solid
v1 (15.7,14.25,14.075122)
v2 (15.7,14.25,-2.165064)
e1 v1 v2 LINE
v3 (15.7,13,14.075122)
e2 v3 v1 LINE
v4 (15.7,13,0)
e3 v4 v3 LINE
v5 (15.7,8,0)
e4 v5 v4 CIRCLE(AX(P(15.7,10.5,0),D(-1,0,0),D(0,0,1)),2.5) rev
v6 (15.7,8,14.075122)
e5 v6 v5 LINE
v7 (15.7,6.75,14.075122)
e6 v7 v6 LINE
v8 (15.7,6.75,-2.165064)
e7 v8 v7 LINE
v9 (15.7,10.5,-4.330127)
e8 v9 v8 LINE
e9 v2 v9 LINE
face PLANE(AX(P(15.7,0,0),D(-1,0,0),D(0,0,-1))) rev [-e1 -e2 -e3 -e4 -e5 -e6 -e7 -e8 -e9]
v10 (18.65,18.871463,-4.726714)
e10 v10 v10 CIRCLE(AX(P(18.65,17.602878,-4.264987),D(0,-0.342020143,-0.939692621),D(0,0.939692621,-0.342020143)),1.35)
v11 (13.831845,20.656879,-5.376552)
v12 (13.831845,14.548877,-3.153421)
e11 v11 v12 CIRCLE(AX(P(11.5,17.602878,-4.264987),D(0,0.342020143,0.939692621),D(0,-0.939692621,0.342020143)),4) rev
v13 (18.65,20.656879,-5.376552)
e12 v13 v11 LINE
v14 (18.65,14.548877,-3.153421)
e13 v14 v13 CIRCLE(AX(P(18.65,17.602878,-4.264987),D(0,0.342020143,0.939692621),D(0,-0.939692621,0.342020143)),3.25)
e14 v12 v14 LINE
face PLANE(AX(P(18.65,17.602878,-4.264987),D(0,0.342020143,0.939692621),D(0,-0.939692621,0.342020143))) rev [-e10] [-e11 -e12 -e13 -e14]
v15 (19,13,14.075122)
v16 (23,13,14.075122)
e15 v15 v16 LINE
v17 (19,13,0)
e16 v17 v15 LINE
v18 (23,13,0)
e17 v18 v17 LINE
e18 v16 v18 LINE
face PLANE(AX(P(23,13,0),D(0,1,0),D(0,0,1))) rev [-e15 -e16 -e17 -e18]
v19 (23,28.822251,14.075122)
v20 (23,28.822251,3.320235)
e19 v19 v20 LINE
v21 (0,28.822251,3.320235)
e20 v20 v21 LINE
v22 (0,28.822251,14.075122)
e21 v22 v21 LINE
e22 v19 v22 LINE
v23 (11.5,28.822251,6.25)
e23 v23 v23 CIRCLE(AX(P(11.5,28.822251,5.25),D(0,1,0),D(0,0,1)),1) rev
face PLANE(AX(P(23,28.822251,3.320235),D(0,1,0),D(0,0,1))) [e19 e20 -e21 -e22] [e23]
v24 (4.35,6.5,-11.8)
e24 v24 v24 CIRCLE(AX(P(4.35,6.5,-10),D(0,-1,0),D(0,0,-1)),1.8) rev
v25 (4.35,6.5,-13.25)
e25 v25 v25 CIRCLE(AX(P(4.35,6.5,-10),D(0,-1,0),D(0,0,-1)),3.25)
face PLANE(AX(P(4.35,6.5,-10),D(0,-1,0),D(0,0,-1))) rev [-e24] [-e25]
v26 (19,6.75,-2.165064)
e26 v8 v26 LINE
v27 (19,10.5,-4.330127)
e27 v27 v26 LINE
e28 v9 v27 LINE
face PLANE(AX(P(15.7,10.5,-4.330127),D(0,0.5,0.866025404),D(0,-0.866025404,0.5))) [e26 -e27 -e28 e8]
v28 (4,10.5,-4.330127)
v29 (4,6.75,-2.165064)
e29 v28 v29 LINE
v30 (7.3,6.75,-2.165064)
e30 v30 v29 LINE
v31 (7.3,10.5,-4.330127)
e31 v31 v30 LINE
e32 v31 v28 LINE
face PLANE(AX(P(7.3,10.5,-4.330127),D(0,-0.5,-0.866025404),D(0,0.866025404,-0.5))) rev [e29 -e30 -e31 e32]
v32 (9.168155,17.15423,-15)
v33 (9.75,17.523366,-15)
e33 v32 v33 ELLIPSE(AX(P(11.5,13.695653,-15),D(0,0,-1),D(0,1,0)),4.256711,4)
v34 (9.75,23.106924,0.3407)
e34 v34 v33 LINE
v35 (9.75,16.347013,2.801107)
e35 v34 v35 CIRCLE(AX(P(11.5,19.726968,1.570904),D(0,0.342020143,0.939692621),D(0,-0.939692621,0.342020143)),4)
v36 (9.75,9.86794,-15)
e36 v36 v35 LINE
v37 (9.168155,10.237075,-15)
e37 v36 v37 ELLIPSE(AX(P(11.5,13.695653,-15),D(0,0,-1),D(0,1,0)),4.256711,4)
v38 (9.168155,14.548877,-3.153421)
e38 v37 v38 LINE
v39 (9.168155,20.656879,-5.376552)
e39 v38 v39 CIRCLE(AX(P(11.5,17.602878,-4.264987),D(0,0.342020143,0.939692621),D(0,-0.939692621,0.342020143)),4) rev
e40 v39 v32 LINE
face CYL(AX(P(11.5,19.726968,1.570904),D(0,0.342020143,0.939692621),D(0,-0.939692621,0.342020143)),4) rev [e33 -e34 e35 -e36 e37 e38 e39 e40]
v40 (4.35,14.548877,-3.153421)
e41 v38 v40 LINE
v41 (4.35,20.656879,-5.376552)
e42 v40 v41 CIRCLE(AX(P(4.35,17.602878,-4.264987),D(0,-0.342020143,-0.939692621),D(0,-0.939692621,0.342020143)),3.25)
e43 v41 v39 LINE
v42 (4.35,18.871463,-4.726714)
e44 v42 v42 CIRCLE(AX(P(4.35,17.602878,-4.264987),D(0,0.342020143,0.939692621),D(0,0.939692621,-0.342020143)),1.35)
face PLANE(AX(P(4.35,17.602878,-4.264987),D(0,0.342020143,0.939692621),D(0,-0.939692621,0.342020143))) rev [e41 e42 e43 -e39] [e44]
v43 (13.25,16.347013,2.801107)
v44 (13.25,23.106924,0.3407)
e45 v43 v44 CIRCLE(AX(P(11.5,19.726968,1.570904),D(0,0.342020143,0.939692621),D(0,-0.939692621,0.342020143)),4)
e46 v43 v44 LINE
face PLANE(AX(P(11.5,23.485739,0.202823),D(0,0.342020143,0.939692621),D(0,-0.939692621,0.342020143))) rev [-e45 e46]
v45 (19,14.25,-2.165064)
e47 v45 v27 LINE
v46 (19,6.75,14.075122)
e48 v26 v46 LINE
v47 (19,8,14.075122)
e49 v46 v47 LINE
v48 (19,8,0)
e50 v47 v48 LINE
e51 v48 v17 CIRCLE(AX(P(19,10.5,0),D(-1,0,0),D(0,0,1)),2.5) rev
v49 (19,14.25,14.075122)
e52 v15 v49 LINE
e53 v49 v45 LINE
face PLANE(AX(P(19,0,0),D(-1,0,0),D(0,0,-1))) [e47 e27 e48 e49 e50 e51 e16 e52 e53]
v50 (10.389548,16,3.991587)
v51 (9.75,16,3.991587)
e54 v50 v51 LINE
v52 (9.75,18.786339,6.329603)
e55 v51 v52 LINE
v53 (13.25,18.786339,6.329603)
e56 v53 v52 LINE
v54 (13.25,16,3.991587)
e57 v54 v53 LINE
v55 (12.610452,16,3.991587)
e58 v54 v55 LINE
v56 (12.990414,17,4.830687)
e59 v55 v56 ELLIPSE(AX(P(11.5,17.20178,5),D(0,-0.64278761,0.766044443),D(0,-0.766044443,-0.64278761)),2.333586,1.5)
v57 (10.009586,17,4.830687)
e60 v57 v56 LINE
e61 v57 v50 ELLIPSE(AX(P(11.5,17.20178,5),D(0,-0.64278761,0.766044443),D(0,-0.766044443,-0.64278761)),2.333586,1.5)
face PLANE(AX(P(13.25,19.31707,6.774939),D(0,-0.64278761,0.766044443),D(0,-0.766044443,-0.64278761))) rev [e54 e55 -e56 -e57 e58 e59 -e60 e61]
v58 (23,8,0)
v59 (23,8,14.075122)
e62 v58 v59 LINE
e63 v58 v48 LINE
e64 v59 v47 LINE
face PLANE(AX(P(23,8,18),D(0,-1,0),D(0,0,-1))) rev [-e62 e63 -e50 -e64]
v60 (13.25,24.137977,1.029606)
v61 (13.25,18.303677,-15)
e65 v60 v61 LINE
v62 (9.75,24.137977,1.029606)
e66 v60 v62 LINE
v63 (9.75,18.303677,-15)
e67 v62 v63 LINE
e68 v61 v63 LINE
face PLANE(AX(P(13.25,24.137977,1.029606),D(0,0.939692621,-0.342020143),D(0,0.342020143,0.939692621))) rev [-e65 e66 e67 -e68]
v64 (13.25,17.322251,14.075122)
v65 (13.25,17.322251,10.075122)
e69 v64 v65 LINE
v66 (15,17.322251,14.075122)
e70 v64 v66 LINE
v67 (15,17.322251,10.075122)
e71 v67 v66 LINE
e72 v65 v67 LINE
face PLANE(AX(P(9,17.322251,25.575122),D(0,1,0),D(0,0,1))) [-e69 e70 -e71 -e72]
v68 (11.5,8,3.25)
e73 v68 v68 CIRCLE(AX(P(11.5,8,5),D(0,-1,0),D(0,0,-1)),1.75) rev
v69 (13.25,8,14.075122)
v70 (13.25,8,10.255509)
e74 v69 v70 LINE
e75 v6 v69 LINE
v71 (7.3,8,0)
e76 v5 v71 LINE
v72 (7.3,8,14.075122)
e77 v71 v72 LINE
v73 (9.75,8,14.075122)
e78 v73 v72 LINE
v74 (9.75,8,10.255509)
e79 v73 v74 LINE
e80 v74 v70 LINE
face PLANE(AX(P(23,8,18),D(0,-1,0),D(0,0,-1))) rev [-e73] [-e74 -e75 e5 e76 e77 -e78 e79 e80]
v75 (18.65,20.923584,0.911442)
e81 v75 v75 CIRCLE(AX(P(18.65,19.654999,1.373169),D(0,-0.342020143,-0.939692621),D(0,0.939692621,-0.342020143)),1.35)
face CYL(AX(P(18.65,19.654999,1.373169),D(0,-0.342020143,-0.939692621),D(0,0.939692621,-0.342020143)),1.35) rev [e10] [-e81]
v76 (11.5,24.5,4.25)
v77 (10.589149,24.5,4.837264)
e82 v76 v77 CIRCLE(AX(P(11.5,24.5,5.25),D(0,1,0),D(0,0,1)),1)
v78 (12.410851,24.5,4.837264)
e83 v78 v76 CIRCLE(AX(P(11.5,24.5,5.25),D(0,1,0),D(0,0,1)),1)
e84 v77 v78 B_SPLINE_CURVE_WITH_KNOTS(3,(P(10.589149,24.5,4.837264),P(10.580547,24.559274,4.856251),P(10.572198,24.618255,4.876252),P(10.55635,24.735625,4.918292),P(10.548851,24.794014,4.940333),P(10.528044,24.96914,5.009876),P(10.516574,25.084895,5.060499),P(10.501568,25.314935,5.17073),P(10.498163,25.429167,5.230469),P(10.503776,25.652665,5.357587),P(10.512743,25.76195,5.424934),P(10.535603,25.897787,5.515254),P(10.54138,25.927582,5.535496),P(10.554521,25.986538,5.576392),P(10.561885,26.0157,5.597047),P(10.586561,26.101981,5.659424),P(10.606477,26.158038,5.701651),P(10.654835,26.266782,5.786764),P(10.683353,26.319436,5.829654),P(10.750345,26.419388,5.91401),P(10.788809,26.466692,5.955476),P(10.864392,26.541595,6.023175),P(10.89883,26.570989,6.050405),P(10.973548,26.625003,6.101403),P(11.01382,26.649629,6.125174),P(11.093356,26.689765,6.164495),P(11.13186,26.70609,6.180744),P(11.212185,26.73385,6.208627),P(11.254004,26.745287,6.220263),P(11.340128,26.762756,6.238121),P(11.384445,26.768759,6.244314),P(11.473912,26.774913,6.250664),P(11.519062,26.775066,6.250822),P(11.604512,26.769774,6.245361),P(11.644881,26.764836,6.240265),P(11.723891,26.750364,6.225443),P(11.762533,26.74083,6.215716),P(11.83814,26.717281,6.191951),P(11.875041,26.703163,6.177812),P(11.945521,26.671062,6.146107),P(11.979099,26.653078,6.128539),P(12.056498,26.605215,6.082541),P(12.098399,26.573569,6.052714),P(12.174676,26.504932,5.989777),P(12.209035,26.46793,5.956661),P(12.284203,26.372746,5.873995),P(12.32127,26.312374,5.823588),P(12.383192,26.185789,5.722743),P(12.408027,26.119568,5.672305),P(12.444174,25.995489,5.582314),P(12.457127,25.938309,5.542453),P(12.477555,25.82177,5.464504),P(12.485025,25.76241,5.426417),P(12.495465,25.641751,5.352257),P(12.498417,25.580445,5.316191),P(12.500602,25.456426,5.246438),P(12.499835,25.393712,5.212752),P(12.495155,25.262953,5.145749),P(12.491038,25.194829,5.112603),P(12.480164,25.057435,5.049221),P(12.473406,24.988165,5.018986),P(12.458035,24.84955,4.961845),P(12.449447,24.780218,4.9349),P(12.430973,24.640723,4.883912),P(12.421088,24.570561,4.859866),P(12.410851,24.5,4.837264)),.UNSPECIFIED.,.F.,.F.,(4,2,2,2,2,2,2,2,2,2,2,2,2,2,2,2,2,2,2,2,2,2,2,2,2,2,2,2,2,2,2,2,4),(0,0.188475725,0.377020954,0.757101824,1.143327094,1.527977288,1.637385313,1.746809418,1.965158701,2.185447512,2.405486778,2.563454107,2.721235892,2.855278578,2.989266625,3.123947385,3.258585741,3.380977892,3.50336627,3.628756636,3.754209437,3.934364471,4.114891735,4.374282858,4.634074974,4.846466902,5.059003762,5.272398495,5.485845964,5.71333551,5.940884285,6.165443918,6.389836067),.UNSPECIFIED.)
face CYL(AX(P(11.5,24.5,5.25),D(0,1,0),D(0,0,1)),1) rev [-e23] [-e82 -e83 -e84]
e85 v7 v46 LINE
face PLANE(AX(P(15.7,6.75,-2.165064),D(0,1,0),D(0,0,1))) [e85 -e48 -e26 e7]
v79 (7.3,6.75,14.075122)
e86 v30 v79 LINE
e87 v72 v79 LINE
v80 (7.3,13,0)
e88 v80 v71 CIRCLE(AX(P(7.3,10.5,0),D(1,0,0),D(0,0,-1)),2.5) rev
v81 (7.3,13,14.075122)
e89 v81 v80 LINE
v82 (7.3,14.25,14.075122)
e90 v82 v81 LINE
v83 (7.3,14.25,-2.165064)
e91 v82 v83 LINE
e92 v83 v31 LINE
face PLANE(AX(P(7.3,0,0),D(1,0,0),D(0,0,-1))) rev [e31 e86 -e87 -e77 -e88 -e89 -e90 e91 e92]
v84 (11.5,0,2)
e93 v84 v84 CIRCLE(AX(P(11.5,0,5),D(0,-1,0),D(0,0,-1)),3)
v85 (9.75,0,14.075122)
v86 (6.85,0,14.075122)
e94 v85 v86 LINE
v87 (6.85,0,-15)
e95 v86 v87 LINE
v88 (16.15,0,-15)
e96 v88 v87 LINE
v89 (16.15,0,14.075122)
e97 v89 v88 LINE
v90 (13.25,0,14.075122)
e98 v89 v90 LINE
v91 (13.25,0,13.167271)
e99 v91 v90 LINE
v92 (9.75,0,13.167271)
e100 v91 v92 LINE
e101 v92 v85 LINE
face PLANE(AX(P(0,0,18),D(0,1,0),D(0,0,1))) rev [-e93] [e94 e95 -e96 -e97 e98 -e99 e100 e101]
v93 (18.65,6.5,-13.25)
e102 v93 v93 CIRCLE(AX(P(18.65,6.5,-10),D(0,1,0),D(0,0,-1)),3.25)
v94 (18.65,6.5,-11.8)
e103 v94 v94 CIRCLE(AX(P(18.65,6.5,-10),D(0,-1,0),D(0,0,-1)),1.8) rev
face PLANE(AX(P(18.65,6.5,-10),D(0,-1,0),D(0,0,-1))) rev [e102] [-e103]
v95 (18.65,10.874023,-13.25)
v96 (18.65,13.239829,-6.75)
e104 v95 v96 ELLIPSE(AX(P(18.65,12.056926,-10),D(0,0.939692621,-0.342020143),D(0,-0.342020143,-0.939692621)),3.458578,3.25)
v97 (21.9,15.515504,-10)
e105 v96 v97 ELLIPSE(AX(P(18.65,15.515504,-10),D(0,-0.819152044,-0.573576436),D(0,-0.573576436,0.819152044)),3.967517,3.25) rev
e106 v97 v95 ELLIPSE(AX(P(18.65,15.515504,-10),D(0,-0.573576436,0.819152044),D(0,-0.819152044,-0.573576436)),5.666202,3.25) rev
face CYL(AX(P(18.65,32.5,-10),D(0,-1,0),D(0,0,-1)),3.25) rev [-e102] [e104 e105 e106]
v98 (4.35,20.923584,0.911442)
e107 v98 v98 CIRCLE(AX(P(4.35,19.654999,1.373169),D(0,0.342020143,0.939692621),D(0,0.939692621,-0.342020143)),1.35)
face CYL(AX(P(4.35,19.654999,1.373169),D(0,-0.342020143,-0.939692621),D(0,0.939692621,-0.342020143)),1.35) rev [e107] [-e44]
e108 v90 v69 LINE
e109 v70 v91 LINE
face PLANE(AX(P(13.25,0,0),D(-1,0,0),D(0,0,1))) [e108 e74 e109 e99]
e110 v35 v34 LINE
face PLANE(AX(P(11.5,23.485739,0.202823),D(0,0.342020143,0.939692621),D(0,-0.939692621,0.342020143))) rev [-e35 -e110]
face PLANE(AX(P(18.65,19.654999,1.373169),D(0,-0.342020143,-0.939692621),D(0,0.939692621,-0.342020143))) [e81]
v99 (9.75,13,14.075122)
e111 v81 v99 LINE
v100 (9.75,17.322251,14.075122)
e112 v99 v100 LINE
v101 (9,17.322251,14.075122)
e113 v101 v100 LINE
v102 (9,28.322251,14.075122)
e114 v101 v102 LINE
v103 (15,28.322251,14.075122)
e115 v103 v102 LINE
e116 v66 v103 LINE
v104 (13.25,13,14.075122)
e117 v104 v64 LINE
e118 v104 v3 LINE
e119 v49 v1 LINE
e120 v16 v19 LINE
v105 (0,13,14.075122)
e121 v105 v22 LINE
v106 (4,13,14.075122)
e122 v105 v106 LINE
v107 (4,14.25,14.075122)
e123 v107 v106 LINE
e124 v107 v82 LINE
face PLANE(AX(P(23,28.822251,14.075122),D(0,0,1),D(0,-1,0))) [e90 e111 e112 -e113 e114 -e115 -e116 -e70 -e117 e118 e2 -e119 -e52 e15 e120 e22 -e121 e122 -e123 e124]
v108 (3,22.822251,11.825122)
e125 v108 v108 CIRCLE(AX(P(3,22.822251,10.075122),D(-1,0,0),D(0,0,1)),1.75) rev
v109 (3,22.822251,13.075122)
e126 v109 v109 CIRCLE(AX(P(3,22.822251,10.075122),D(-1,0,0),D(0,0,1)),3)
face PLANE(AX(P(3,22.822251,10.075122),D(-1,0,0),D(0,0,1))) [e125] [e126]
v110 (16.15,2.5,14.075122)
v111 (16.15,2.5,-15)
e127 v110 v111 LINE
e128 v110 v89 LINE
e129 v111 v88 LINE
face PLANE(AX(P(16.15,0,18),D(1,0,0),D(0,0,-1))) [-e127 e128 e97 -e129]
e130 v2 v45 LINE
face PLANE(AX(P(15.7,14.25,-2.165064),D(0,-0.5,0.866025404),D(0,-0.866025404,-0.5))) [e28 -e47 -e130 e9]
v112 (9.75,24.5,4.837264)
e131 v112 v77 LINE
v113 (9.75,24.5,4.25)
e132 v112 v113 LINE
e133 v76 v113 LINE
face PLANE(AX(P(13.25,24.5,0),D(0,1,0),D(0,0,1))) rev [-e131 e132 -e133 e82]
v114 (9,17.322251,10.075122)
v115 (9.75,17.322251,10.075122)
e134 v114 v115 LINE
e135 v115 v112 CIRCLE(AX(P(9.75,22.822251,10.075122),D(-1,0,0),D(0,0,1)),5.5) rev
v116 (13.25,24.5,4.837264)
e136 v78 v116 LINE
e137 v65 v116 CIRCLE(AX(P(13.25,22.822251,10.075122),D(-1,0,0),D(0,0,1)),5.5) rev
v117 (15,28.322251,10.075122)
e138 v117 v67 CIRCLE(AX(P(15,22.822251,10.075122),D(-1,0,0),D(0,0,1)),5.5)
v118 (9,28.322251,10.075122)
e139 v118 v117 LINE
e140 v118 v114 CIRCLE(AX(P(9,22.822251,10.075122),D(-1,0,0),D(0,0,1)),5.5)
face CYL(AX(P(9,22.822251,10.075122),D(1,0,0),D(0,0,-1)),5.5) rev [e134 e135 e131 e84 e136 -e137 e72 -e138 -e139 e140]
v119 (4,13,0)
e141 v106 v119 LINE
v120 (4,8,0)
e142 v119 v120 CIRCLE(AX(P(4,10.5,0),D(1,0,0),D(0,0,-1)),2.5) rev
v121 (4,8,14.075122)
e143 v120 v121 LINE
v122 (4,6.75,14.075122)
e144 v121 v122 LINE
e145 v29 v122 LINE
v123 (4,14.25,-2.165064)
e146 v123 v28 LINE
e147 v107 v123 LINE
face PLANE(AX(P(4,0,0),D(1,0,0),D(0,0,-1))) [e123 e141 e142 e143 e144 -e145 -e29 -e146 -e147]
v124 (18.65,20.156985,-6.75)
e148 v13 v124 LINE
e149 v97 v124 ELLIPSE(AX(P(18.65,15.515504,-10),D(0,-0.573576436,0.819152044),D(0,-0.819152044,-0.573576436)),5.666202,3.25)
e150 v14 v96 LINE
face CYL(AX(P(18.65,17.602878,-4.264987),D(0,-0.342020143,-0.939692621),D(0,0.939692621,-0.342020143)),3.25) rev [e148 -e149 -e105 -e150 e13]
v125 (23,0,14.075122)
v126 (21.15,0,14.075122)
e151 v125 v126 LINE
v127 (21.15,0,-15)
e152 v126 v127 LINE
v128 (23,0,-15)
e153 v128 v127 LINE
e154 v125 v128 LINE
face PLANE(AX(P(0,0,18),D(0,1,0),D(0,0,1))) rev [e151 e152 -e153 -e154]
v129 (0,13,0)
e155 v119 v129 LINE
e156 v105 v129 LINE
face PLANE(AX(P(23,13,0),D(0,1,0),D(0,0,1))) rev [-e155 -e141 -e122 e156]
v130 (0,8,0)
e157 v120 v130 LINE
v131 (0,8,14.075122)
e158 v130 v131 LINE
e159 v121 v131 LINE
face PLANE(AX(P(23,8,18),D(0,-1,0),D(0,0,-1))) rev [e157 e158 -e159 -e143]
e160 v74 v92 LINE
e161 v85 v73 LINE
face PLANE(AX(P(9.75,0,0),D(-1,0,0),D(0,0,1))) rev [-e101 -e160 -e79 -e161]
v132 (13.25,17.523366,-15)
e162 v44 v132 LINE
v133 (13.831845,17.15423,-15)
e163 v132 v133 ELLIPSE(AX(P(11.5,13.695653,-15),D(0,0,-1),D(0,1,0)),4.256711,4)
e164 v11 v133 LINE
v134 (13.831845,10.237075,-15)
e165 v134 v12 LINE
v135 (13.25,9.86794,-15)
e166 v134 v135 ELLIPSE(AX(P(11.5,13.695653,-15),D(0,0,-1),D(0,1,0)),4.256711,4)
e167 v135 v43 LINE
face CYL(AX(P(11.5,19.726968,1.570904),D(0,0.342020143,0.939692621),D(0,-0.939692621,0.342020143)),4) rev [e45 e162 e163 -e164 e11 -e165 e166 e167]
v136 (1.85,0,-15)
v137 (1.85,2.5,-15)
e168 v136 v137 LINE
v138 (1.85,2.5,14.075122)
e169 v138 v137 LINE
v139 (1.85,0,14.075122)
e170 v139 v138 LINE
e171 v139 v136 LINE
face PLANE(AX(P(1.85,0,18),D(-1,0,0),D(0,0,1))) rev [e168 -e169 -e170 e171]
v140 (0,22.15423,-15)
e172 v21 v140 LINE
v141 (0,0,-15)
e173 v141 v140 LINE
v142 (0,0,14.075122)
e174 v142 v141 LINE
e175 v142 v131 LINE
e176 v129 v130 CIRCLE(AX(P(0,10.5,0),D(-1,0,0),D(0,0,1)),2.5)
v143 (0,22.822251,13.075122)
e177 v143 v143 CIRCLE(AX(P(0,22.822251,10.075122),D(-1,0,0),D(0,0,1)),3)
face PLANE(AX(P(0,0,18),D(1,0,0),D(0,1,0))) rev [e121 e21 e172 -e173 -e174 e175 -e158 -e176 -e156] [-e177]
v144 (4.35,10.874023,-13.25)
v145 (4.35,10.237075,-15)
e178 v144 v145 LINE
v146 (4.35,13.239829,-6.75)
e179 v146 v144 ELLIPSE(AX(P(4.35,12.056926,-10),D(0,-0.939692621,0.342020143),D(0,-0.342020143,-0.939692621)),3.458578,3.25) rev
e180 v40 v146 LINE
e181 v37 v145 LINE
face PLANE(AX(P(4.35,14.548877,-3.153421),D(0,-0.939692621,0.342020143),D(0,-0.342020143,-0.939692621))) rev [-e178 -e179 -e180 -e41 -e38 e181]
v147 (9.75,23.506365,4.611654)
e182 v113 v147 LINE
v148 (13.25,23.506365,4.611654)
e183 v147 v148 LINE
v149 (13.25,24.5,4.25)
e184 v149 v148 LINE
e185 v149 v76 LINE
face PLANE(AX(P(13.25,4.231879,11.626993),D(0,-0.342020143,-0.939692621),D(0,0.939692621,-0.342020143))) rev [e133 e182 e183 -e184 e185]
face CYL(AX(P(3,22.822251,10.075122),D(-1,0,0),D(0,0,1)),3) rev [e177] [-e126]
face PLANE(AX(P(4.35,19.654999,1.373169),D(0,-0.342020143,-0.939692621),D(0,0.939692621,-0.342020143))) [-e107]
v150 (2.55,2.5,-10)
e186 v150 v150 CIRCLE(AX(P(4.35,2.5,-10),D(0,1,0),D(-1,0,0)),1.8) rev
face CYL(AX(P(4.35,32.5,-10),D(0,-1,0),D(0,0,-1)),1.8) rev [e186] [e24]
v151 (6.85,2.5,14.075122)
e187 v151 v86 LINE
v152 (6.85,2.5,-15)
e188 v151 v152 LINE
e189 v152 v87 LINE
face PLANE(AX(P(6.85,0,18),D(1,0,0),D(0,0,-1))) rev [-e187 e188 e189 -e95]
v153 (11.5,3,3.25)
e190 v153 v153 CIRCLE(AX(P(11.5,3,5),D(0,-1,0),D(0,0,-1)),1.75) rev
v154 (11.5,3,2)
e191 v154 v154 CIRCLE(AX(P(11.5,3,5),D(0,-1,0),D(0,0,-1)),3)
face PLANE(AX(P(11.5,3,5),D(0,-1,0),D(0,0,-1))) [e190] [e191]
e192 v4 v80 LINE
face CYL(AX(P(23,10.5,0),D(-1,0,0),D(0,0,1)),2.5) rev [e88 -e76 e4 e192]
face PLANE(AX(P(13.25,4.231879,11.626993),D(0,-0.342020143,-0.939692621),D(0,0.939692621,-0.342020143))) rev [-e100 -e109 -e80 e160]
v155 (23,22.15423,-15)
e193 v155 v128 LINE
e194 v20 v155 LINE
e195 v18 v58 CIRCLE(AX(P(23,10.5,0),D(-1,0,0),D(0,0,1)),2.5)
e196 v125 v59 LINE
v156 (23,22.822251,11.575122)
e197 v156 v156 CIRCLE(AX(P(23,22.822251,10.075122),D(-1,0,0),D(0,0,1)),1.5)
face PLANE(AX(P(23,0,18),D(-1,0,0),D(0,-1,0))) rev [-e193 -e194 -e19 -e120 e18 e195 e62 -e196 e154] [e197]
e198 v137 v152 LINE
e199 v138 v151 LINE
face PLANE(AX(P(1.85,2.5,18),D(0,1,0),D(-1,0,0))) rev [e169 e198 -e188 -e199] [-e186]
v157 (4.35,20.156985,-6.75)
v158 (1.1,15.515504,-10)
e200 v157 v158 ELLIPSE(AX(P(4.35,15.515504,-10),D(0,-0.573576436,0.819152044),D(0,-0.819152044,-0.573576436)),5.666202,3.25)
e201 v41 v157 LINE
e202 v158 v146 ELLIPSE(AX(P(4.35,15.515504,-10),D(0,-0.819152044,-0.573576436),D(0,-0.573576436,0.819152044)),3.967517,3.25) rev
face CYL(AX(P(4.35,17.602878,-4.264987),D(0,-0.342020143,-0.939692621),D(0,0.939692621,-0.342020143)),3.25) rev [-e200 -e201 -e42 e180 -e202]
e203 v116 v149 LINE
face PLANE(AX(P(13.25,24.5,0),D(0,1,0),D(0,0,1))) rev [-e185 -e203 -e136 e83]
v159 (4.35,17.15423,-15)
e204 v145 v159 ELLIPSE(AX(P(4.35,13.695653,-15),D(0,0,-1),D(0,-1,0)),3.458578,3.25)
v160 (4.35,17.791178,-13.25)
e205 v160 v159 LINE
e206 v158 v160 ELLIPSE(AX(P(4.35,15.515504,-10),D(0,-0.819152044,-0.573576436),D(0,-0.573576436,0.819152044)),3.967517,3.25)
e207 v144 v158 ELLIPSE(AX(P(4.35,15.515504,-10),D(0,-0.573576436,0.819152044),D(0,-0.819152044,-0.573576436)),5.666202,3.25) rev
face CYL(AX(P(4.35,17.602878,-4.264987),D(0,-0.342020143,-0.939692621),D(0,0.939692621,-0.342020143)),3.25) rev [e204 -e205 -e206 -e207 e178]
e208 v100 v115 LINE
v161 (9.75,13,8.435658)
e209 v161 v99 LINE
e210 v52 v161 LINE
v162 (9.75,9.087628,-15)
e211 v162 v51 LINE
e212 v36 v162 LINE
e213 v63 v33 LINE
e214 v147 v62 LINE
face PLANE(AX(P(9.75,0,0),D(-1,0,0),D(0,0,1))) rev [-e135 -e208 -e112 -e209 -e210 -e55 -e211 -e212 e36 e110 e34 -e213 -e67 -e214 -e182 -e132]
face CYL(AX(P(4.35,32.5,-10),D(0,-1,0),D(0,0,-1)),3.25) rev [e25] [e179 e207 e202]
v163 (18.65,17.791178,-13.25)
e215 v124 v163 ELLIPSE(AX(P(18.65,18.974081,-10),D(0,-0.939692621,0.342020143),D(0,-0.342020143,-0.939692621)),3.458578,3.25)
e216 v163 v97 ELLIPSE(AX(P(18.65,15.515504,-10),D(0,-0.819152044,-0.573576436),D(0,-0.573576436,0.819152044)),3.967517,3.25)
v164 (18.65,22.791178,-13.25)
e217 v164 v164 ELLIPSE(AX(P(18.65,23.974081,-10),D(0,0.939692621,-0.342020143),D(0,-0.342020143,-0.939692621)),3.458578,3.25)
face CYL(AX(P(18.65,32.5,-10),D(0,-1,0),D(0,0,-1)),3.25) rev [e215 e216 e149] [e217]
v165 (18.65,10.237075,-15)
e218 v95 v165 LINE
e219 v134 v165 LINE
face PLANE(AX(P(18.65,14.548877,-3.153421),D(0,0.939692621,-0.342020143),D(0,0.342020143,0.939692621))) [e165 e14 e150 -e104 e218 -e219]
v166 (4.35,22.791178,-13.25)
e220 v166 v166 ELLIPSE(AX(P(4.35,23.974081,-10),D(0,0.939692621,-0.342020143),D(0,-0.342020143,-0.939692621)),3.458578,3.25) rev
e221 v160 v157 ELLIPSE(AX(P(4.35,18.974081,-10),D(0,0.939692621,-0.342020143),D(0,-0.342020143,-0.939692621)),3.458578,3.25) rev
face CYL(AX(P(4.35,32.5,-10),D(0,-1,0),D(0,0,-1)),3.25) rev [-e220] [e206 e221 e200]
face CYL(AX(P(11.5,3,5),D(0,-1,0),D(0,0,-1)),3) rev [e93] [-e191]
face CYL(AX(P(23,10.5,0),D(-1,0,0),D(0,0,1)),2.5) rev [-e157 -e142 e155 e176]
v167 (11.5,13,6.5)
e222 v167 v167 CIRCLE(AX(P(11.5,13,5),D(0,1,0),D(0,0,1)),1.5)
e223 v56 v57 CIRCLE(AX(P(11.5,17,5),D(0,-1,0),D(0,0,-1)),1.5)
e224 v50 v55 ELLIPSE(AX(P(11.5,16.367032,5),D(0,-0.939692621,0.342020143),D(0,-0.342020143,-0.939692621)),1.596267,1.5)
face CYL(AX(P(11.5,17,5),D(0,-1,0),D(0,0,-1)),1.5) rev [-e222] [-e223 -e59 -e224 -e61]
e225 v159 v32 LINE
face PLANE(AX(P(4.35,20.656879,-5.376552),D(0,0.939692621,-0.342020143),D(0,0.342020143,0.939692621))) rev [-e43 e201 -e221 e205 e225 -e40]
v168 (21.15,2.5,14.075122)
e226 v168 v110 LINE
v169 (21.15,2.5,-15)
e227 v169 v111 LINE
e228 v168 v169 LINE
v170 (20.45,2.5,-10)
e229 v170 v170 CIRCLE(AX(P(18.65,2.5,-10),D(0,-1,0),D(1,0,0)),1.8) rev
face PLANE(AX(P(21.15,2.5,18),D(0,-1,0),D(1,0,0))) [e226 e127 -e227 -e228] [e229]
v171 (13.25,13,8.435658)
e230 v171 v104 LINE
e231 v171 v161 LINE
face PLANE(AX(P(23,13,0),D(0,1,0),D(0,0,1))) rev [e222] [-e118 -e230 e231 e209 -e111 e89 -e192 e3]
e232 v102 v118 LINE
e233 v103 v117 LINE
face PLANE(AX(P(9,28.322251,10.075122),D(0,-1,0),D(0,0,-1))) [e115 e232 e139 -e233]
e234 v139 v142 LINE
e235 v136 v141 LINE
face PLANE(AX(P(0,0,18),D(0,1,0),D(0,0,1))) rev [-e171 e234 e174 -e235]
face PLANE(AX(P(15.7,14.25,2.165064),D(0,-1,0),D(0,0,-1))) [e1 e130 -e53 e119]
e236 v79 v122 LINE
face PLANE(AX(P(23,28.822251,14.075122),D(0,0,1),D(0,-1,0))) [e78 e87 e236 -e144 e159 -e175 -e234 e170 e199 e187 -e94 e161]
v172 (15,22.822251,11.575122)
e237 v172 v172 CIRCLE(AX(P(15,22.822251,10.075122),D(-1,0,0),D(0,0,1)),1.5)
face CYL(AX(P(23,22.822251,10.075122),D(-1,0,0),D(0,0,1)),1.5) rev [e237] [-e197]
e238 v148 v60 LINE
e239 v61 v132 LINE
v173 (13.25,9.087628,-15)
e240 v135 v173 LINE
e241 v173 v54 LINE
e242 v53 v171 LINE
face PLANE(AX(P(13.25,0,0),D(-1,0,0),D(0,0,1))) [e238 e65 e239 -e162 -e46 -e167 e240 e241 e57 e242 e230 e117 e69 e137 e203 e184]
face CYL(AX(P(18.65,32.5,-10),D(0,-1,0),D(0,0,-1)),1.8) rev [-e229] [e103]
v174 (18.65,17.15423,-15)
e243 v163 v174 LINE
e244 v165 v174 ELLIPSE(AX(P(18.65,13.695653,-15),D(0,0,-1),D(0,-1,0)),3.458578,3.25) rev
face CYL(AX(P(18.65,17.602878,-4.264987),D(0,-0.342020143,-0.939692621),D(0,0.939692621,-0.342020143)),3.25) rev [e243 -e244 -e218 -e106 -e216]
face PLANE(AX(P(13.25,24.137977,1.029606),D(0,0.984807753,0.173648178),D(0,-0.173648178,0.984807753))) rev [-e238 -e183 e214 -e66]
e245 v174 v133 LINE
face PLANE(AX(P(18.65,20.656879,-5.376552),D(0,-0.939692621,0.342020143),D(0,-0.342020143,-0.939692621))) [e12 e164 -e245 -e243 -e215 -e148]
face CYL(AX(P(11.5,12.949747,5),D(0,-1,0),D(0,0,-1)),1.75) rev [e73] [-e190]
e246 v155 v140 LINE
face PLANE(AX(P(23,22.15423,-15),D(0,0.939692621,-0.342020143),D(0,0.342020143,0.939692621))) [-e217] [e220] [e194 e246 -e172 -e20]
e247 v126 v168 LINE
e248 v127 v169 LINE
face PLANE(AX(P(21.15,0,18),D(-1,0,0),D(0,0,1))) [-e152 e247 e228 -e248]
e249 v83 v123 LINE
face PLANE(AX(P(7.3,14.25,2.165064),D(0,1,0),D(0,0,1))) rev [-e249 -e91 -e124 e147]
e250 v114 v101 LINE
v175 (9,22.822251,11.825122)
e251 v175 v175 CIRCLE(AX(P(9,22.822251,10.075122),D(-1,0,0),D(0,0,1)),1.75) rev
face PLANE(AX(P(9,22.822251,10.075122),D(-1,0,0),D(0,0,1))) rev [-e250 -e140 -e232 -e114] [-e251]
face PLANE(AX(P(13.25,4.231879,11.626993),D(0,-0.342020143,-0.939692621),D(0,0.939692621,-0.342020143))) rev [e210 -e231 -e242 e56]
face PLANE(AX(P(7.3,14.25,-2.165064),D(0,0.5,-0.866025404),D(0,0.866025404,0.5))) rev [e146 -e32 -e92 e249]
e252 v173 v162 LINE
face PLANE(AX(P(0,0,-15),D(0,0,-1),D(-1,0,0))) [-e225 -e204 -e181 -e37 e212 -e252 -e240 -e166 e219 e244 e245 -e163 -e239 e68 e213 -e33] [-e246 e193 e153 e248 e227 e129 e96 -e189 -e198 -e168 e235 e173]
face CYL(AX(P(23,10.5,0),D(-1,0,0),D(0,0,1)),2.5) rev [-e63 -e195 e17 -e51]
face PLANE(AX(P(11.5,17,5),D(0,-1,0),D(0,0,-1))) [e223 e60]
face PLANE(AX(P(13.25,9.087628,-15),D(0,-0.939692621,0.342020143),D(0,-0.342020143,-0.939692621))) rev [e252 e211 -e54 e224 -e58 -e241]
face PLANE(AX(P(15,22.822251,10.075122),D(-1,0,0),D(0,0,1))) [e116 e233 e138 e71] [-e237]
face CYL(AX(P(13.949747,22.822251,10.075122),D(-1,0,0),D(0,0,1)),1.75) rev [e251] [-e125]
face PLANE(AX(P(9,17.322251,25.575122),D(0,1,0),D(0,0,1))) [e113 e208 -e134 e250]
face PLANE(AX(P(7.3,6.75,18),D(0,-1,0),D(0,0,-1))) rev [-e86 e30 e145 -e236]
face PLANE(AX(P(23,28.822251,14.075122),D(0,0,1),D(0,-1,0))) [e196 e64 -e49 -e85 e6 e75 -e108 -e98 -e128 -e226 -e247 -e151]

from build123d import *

# Parameters (mm, degrees)
SKETCH1_W                = 23
SKETCH1_H                = 32.5
BOSS_EXTRUDE1_DEPTH      = 18
SKETCH2_W                = 23
SKETCH2_H                = 25
BOSS_EXTRUDE2_DEPTH      = 15
CHAMFER1_SIZE            = 15
SKETCH3_R                = 1.8
CUT_EXTRUDE1_DEPTH       = 44.694965385
CUT_EXTRUDE2_DEPTH       = 44.694965385
CUT_EXTRUDE3_START       = -4
CUT_EXTRUDE3_DEPTH       = 3.3
SKETCH7_W                = 5
SKETCH7_H                = 2.5
CUT_EXTRUDE4_DEPTH       = 52.713151132
CUT_EXTRUDE5_START       = -6.5
SKETCH8_R                = 3.25
CUT_EXTRUDE5_DEPTH       = 38.194965385
SKETCH9_R                = 1
CUT_EXTRUDE6_DEPTH       = 8
CUT_EXTRUDE8_DEPTH       = 1.75
CUT_EXTRUDE7_DEPTH       = 1.75
CUT_EXTRUDE9_DEPTH       = 13
SKETCH15_R               = 1.35
CUT_EXTRUDE10_DEPTH      = 6
CUT_EXTRUDE11_DEPTH      = 2.5
CUT_EXTRUDE11_DEPTH_BACK = 3.5
SKETCH17_R               = 1.75
CUT_EXTRUDE12_DEPTH      = 9
SKETCH18_R               = 3
CUT_EXTRUDE13_DEPTH      = 3
SKETCH19_R               = 1.5
CUT_EXTRUDE14_DEPTH      = 44.694965459
SKETCH20_R               = 1.75
CUT_EXTRUDE15_DEPTH      = 8
SKETCH21_R               = 3
CUT_EXTRUDE16_DEPTH      = 3
SKETCH22_R               = 1.5
CUT_EXTRUDE17_DEPTH      = 17
CUT_EXTRUDE18_DEPTH      = 44.694965459


with BuildPart() as part:
    # Sketch1 → Boss-Extrude1 (new body)
    with BuildSketch(Plane.XY):
        with Locations((11.5, 16.25)):
            Rectangle(SKETCH1_W, SKETCH1_H)
    extrude(amount=BOSS_EXTRUDE1_DEPTH)

    # Sketch2 → Boss-Extrude2 (add)
    with BuildSketch(Plane(origin=(0, 0, 0), x_dir=(-1, 0, 0), z_dir=(0, 0, -1))):
        with Locations((-11.5, 12.5)):
            Rectangle(SKETCH2_W, SKETCH2_H)
    extrude(amount=BOSS_EXTRUDE2_DEPTH)

    # Chamfer1
    # the kernel refuses this chamfer: 15 mm, written as the material it adds along each edge
    with BuildSketch(Plane(origin=(23, 25, 0), x_dir=(0, -0.02749587661058632, -0.9996219169112968), z_dir=(-1, 0, 0))) as chamfer1_piece_1_section:
        Polygon((CHAMFER1_SIZE * 0.999621916911, -CHAMFER1_SIZE * 0.0274958766106), (-CHAMFER1_SIZE * 0.0274958766106, -CHAMFER1_SIZE * 0.999621916911), (0, 0), align=None)
    chamfer1_piece_1 = extrude(amount=23, mode=Mode.PRIVATE)
    chamfer1_piece_1 = split(chamfer1_piece_1, bisect_by=Plane(origin=(11.5, 28.131672391, -15), z_dir=(0, 0, 1)), keep=Keep.TOP, mode=Mode.PRIVATE)
    chamfer1_piece_1 = split(chamfer1_piece_1, bisect_by=Plane(origin=(11.5, 32.5, -5.879790556), z_dir=(0, -1, 0)), keep=Keep.TOP, mode=Mode.PRIVATE)
    add(chamfer1_piece_1)

    # Sketch3 → Cut-Extrude1 (cut, through all)
    with BuildSketch(Plane.XZ):
        with Locations(Location((4.35, -10, 0), (0, 0, 270))):
            Circle(SKETCH3_R)
        with Locations(Location((18.65, -10, 0), (0, 0, 270))):
            Circle(SKETCH3_R)
    extrude(amount=-CUT_EXTRUDE1_DEPTH, mode=Mode.SUBTRACT)

    # Sketch4 → Cut-Extrude2 (cut, through all)
    with BuildSketch(Plane.ZY):
        with BuildLine():
            Line((0, 13), (18, 13))
            Line((18, 13), (18, 8))
            Line((18, 8), (0, 8))
            ThreePointArc((0, 8), (-2.5, 10.5), (0, 13))
        make_face()
    extrude(amount=-CUT_EXTRUDE2_DEPTH, mode=Mode.SUBTRACT)

    # Sketch5 → Cut-Extrude3 (cut)
    with BuildSketch(Plane.ZY.offset(CUT_EXTRUDE3_START)):
        Polygon((2.165063509, 14.25), (-2.165063509, 14.25), (-4.330127019, 10.5), (-2.165063509, 6.75), (2.165063509, 6.75), (18, 6.75), (18, 14.25), align=None)
    cut_extrude3 = extrude(amount=-CUT_EXTRUDE3_DEPTH, mode=Mode.SUBTRACT)

    # Sketch7 → Cut-Extrude4 (cut, through all)
    with BuildSketch(Plane(origin=(0, 0, -15), x_dir=(-1, 0, 0), z_dir=(0, 0, -1))):
        with Locations((-4.35, 1.25)):
            Rectangle(SKETCH7_W, SKETCH7_H)
    cut_extrude4 = extrude(amount=-CUT_EXTRUDE4_DEPTH, mode=Mode.SUBTRACT)

    # Sketch8 → Cut-Extrude5 (cut, through all)
    with BuildSketch(Plane.XZ.offset(CUT_EXTRUDE5_START)):
        with Locations(Location((4.35, -10, 0), (0, 0, 270))):
            Circle(SKETCH8_R)
    cut_extrude5 = extrude(amount=-CUT_EXTRUDE5_DEPTH, mode=Mode.SUBTRACT)

    # Mirror1: Cut-Extrude3, Cut-Extrude4, Cut-Extrude5 across plane
    add(cut_extrude3.mirror(Plane.ZY.offset(-11.5)), mode=Mode.SUBTRACT)
    add(cut_extrude4.mirror(Plane.ZY.offset(-11.5)), mode=Mode.SUBTRACT)
    add(cut_extrude5.mirror(Plane.ZY.offset(-11.5)), mode=Mode.SUBTRACT)

    # Sketch9 → Cut-Extrude6 (cut)
    with BuildSketch(Plane(origin=(0, 32.5, 0), x_dir=(1, 0, 0), z_dir=(0, 1, 0))):
        with Locations(Location((11.5, -5.25, 0), (0, 0, 270))):
            Circle(SKETCH9_R)
    extrude(amount=-CUT_EXTRUDE6_DEPTH, mode=Mode.SUBTRACT)

    # Sketch10 → Cut-Extrude8 (cut, symmetric)
    with BuildSketch(Plane.ZY.offset(-11.5)):
        Polygon((4.25, 24.5), (18, -13.277814518), (31.330171166, -4.978014809), (56.797179747, 10.878576059), (6.25, 24.5), align=None)
    extrude(amount=CUT_EXTRUDE8_DEPTH, both=True, mode=Mode.SUBTRACT)

    # Sketch11 → Cut-Extrude7 (cut, symmetric)
    with BuildSketch(Plane.ZY.offset(-11.5)):
        Polygon((1.029605681, 24.137976813), (5.29394834, 23.386058148), (6.774939004, 19.317069741), (3.991587008, 16), (-15, 9.087627628), (-15, 18.303677479), align=None)
    extrude(amount=CUT_EXTRUDE7_DEPTH, both=True, mode=Mode.SUBTRACT)

    # Sketch12 → Cut-Revolve2 (revolve, cut)
    with BuildSketch(Plane.ZY.offset(-11.5)):
        Polygon((0.20282315, 23.485738747), (1.570903724, 19.726968263), (-16.480990664, 13.156616034), (-17.849071237, 16.915386518), align=None)
    revolve(axis=Axis((11.5, 19.726968263, 1.570903724), (0, -0.34202014332567215, -0.9396926207859072)), mode=Mode.SUBTRACT)

    # Sketch13 → Cut-Extrude9 (cut)
    with BuildSketch(Plane(origin=(0, -3.757856581, -10.324626103), x_dir=(1, 0, 0), z_dir=(0, 0.34202014332567177, 0.9396926207859073))):
        with BuildLine():
            Line((18.65, 21.250005791), (11.5, 21.250005791))
            Line((11.5, 21.250005791), (11.5, 14.750005791))
            Line((11.5, 14.750005791), (18.65, 14.750005791))
            ThreePointArc((18.65, 14.750005791), (21.9, 18.000005791), (18.65, 21.250005791))
        make_face()
    cut_extrude9 = extrude(amount=CUT_EXTRUDE9_DEPTH, mode=Mode.SUBTRACT)

    # Sketch15 → Cut-Extrude10 (cut)
    with BuildSketch(Plane(origin=(0, 0.688405282, 1.891377967), x_dir=(-1, 0, 0), z_dir=(0, -0.34202014332567177, -0.9396926207859073))):
        with Locations(Location((-18.65, 18.000005791, 0), (0, 0, 90))):
            Circle(SKETCH15_R)
    cut_extrude10 = extrude(amount=-CUT_EXTRUDE10_DEPTH, mode=Mode.SUBTRACT)

    # Mirror2: Cut-Extrude9, Cut-Extrude10 across plane
    add(cut_extrude9.mirror(Plane.ZY.offset(-11.5)), mode=Mode.SUBTRACT)
    add(cut_extrude10.mirror(Plane.ZY.offset(-11.5)), mode=Mode.SUBTRACT)

    # Sketch16 → Cut-Extrude11 (cut, two sides: drawn at the far end of the back side and taken through both)
    with BuildSketch(Plane.ZY.offset(-11.5).offset(-CUT_EXTRUDE11_DEPTH_BACK)):
        with BuildLine():
            Line((10.075121942, 28.322250561), (25.575121942, 28.322250561))
            Line((25.575121942, 28.322250561), (25.575121942, 17.322250561))
            Line((25.575121942, 17.322250561), (10.075121942, 17.322250561))
            ThreePointArc((10.075121942, 17.322250561), (4.575121942, 22.822250561), (10.075121942, 28.322250561))
        make_face()
    extrude(amount=CUT_EXTRUDE11_DEPTH + CUT_EXTRUDE11_DEPTH_BACK, mode=Mode.SUBTRACT)

    # Sketch17 → Cut-Extrude12 (cut)
    with BuildSketch(Plane.ZY):
        with Locations((10.075121942, 22.822250561)):
            Circle(SKETCH17_R)
    extrude(amount=-CUT_EXTRUDE12_DEPTH, mode=Mode.SUBTRACT)

    # Sketch18 → Cut-Extrude13 (cut)
    with BuildSketch(Plane.ZY):
        with Locations((10.075121942, 22.822250561)):
            Circle(SKETCH18_R)
    extrude(amount=-CUT_EXTRUDE13_DEPTH, mode=Mode.SUBTRACT)

    # Sketch19 → Cut-Extrude14 (cut, through all)
    with BuildSketch(Plane.ZY):
        with Locations((10.075121942, 22.822250561)):
            Circle(SKETCH19_R)
    extrude(amount=-CUT_EXTRUDE14_DEPTH, mode=Mode.SUBTRACT)

    # Sketch20 → Cut-Extrude15 (cut)
    with BuildSketch(Plane.XZ):
        with Locations(Location((11.5, 5, 0), (0, 0, 270))):
            Circle(SKETCH20_R)
    extrude(amount=-CUT_EXTRUDE15_DEPTH, mode=Mode.SUBTRACT)

    # Sketch21 → Cut-Extrude16 (cut)
    with BuildSketch(Plane.XZ):
        with Locations(Location((11.5, 5, 0), (0, 0, 270))):
            Circle(SKETCH21_R)
    extrude(amount=-CUT_EXTRUDE16_DEPTH, mode=Mode.SUBTRACT)

    # Sketch22 → Cut-Extrude17 (cut)
    with BuildSketch(Plane.XZ):
        with Locations(Location((11.5, 5, 0), (0, 0, 222.242919533))):
            Circle(SKETCH22_R)
    extrude(amount=-CUT_EXTRUDE17_DEPTH, mode=Mode.SUBTRACT)

    # Sketch23 → Cut-Extrude18 (cut, through all)
    with BuildSketch(Plane(origin=(0, 0, 0), x_dir=(0, 0, -1), z_dir=(1, 0, 0))):
        Polygon((-18, 32.5), (-14.075121942, 32.5), (-13.4247686, 32.5), (15, 32.5), (15, 22.154230314), (-3.320235061, 28.822250561), (-14.075121942, 28.822250561), (-14.075121942, 0), (-18, 0), align=None)
    extrude(amount=CUT_EXTRUDE18_DEPTH, mode=Mode.SUBTRACT)


solid = part.part
